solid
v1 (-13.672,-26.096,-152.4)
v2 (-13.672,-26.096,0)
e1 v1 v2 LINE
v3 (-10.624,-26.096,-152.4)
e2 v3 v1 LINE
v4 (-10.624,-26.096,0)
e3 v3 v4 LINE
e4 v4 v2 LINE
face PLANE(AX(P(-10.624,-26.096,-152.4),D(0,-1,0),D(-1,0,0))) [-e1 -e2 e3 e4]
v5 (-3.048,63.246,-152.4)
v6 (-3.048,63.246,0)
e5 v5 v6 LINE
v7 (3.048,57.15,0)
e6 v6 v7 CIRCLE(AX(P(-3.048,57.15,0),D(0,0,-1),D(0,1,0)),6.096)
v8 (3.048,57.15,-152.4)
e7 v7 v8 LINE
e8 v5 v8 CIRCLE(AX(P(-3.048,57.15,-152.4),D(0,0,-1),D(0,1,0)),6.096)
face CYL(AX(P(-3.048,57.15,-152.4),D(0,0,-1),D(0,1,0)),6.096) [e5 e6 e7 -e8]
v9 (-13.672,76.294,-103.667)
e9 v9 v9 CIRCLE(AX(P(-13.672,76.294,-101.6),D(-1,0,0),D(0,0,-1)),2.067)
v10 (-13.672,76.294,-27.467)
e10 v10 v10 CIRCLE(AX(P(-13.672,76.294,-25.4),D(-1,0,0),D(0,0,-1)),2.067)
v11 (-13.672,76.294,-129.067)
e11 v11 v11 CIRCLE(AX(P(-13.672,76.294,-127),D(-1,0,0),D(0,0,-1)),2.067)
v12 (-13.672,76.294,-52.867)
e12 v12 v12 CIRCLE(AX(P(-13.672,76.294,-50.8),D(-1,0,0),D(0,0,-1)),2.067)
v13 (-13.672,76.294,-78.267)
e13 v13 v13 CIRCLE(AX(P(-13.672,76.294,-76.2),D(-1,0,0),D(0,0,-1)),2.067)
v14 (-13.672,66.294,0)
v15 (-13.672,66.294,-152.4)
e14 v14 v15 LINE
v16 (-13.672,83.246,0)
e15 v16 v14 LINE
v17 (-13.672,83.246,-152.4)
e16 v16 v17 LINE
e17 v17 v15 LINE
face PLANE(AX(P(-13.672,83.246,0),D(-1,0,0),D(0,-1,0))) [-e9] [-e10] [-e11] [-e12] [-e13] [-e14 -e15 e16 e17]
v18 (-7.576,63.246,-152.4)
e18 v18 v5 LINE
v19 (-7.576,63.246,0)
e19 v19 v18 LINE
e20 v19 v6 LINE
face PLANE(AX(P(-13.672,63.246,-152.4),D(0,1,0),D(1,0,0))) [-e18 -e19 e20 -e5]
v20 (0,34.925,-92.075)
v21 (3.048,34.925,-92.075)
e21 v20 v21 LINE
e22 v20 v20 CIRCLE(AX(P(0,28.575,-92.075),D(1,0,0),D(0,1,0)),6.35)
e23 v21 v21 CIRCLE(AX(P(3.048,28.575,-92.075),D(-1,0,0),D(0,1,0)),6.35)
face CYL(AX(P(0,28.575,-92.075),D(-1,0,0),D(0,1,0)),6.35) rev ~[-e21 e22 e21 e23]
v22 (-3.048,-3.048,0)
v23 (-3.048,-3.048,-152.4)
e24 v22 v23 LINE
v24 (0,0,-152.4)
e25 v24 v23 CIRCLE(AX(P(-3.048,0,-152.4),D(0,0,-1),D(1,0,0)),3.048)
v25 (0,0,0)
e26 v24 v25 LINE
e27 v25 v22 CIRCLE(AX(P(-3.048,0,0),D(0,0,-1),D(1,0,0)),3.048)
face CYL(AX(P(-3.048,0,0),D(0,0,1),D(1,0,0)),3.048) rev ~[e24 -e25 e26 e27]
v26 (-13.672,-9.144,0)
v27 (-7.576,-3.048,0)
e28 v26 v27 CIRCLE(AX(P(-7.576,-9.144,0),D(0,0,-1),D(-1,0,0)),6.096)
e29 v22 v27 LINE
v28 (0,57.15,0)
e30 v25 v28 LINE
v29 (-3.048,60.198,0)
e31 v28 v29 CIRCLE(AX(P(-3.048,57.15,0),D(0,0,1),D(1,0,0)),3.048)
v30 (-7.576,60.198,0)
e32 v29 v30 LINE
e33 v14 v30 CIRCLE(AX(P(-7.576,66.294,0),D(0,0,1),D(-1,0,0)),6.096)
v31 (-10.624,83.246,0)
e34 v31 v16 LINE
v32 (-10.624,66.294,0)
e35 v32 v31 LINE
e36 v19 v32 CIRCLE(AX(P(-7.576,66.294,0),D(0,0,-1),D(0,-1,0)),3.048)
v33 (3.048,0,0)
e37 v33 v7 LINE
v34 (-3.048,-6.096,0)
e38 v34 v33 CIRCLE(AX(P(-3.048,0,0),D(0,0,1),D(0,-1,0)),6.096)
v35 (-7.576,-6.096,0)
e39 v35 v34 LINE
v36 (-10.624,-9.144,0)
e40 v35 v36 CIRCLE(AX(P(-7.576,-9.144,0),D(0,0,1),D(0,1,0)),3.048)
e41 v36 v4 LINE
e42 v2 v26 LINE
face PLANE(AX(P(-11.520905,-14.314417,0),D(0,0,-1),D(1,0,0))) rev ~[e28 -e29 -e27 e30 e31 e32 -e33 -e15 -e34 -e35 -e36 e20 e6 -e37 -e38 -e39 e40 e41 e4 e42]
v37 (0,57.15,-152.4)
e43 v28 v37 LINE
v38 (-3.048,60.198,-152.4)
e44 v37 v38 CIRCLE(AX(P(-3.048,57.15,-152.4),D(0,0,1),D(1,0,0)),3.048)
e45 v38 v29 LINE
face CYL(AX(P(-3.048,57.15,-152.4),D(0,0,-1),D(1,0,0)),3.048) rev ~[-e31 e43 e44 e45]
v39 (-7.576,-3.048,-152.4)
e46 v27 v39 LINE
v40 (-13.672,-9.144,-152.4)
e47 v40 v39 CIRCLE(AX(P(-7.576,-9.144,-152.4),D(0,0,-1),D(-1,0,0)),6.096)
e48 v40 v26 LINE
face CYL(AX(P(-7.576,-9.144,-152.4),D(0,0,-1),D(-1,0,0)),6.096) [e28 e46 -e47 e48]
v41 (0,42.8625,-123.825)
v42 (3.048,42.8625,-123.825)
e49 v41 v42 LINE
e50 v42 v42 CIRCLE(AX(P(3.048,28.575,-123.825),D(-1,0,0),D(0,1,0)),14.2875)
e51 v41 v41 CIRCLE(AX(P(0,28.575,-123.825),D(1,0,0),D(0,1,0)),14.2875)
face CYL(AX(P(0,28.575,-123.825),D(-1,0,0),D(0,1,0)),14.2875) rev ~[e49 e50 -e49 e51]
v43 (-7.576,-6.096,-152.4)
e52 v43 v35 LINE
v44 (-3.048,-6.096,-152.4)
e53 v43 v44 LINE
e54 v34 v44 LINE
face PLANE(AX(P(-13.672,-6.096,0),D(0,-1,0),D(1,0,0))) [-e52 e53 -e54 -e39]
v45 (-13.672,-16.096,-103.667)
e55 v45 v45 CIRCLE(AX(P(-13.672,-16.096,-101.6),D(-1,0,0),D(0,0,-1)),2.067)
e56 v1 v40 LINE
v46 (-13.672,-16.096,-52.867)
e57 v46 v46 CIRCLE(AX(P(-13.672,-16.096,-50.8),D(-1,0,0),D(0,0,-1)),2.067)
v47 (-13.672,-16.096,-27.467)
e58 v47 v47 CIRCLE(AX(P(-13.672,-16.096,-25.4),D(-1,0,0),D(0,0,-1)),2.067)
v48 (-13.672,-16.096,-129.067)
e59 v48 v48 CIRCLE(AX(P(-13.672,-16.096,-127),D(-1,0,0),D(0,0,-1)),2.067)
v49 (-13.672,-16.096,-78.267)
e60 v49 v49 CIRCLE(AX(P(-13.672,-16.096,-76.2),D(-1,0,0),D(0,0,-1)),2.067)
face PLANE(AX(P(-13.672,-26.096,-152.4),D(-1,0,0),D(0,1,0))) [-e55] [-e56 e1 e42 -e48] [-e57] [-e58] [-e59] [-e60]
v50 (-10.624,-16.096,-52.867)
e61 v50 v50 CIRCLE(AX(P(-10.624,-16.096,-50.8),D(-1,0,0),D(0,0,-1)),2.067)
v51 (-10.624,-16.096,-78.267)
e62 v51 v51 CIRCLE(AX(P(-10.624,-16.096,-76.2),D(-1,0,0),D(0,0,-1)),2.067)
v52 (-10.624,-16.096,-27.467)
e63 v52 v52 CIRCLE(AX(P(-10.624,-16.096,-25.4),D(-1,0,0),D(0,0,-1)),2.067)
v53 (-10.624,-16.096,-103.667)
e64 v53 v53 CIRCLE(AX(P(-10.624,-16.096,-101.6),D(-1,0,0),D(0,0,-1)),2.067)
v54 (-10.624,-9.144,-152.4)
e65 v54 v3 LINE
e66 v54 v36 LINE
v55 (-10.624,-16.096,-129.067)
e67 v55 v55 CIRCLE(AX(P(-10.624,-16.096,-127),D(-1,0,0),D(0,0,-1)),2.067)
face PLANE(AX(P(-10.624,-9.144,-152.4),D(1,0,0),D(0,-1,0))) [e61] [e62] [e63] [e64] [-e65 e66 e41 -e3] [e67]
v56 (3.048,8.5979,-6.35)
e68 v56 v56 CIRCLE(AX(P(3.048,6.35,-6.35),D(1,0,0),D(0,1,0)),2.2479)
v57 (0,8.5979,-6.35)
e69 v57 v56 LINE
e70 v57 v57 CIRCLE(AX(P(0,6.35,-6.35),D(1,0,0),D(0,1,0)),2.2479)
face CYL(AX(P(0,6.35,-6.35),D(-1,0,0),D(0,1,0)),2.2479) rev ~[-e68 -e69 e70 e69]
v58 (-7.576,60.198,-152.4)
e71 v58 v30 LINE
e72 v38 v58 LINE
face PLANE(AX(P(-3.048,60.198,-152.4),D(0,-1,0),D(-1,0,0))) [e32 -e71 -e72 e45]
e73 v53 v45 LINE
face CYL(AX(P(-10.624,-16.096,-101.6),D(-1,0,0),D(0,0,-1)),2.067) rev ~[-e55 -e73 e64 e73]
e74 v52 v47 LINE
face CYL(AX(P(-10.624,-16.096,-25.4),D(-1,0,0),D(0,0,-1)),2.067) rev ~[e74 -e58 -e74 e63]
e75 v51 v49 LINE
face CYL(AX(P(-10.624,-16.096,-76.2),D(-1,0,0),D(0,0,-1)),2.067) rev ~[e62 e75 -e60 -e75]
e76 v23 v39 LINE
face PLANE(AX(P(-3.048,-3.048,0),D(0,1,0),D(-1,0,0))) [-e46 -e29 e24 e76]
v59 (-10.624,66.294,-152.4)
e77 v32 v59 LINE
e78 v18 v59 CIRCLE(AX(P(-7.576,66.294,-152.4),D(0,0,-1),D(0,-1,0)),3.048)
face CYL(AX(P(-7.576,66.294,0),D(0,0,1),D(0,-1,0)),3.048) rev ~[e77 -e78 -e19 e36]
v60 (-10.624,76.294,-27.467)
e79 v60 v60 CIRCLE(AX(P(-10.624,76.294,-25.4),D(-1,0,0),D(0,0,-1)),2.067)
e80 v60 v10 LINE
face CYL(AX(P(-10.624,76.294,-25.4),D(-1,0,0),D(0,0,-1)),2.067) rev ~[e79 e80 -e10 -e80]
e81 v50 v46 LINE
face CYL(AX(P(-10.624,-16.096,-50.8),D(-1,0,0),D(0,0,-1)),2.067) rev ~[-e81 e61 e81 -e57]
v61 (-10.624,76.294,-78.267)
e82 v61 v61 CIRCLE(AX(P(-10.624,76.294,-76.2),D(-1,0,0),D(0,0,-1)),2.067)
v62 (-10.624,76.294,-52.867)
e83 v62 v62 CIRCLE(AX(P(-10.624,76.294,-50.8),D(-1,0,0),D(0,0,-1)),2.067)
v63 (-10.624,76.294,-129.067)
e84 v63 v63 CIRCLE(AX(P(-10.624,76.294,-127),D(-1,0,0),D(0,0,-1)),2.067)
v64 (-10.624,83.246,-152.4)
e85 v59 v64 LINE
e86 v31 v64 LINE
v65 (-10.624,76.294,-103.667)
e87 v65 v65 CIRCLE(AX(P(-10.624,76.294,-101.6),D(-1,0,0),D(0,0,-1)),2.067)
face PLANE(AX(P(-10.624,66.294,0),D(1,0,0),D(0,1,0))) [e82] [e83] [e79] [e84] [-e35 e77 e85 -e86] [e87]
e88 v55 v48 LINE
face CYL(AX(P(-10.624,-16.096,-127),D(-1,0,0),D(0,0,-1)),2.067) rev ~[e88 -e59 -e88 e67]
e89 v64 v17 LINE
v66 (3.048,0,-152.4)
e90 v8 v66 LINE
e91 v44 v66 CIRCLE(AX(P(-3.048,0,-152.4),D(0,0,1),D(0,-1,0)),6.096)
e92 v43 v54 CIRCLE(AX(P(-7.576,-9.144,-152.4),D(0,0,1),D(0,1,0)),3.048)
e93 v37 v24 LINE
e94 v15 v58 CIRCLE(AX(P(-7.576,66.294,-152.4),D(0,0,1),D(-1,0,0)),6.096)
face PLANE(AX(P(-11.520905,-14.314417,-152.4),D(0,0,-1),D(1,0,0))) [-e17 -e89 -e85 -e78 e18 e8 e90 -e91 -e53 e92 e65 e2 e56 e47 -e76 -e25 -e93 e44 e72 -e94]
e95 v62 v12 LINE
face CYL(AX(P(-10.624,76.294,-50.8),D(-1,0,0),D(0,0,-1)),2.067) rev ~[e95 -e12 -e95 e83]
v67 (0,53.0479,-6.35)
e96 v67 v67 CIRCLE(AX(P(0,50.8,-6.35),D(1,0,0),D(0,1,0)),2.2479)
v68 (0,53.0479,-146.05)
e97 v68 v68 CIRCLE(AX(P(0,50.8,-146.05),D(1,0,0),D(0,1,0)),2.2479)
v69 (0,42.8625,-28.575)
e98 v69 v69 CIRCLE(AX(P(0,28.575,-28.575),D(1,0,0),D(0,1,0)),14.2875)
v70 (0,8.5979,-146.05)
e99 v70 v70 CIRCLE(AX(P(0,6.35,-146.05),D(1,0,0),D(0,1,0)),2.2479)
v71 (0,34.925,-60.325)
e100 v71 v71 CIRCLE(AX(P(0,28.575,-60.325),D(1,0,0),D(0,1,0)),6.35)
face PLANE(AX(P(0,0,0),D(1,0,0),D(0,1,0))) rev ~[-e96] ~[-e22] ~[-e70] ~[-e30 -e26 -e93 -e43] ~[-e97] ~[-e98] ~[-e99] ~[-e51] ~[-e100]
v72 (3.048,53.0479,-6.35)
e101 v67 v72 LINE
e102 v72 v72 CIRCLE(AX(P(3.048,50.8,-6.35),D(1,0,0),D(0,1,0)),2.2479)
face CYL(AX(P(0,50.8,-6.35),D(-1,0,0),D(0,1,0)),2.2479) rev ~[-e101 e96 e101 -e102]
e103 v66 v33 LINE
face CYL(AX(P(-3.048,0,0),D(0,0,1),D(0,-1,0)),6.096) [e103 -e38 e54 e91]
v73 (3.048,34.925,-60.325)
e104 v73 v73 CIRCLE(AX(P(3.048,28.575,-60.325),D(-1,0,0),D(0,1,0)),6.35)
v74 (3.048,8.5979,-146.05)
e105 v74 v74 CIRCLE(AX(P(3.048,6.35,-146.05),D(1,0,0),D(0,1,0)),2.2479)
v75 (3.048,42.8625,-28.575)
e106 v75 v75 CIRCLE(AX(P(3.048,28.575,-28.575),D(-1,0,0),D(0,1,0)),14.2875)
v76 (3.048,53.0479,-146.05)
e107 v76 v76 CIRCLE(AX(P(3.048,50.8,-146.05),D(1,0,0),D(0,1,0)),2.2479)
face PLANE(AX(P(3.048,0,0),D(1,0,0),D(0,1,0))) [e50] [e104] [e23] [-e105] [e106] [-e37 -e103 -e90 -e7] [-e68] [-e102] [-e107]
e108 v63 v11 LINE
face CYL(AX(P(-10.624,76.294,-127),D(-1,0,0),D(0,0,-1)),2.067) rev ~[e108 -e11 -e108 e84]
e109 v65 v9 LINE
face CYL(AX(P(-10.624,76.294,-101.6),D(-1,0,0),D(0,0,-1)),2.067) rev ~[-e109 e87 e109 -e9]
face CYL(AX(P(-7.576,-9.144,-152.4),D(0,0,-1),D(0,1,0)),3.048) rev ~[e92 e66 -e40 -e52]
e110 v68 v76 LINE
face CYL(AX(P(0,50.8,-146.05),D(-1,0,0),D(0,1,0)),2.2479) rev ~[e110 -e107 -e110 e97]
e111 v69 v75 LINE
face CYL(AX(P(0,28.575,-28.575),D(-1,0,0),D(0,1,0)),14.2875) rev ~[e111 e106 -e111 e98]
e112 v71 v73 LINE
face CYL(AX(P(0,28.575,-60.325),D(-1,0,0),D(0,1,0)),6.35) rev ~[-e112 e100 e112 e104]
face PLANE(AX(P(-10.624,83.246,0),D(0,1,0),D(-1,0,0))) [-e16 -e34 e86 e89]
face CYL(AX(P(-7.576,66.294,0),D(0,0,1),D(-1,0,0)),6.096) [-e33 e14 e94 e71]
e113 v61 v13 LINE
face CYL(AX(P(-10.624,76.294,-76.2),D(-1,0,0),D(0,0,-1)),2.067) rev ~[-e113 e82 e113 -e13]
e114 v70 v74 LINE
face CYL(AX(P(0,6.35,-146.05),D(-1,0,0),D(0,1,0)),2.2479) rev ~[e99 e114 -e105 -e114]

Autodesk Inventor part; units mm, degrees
ref_plane "YZ Plane" through (0, 0, 0) normal (1, 0, 0) x (0, 1, 0)
ref_plane "XZ Plane" through (0, 0, 0) normal (0, 1, 0) x (-1, 0, 0)
ref_plane "XY Plane" through (0, 0, 0) normal (0, 0, 1) x (1, 0, 0)
sketch "Sketch3" plane through (-13.672, 63.246, 0) normal (0, 1, 0) x (1, 0, 0)
  line L0 (10.624, 0) -> (10.624, 152.4) projected
  line L1 (0, 152.4) -> (10.624, 152.4) projected
  line L2 (0, 0) -> (0, 152.4) projected
  line L3 (10.624, 0) -> (0, 0) projected
  point P0 (13.672, 0)
  point P1 (5.312, 127)
  point P2 (5.312, 152.4)
  point P3 (5.312, 101.6)
  point P4 (5.312, 76.2)
  point P5 (5.312, 50.8)
  point P6 (5.312, 25.4)
  dimension "d28" = 25.4
  dimension "d31" = 25.4
sketch "Sketch1" plane through (0, 0, 0) normal (1, 0, 0) x (0, 1, 0)
  line L0 (0, 0) -> (57.15, 0)
  line L1 (57.15, 0) -> (57.15, -152.4)
  line L2 (57.15, -152.4) -> (0, -152.4)
  line L3 (0, -152.4) -> (0, 0)
  circle A0 centre (28.575, -28.575) radius 14.2875
  circle A1 centre (28.575, -60.325) radius 6.35
  circle A2 centre (28.575, -92.075) radius 6.35
  circle A3 centre (28.575, -123.825) radius 14.2875
  circle A4 centre (50.8, -6.35) radius 2.2479
  circle A5 centre (50.8, -146.05) radius 2.2479
  circle A6 centre (6.35, -146.05) radius 2.2479
  circle A7 centre (6.35, -6.35) radius 2.2479
  line L4 (50.8, -6.35) -> (6.35, -6.35) construction
  line L5 (6.35, -6.35) -> (6.35, -146.05) construction
  line L6 (6.35, -146.05) -> (50.8, -146.05) construction
  line L7 (50.8, -146.05) -> (50.8, -6.35) construction
  line L8 (57.15, 0) -> (69.85, 0)
  line L9 (69.85, 0) -> (69.85, -152.4)
  line L10 (69.85, -152.4) -> (57.15, -152.4)
  line L11 (57.15, -152.4) -> (57.15, 0)
  line L12 (0, -152.4) -> (-12.7, -152.4)
  line L13 (-12.7, -152.4) -> (-12.7, 0)
  line L14 (-12.7, 0) -> (0, 0)
  line L15 (0, 0) -> (0, -152.4)
  line L16 (28.575, -123.825) -> (28.575, -28.575)
  point P0 (28.575, -152.4)
  point P1 (28.575, -6.35)
  point P2 (28.575, 0)
  point P3 (50.8, -76.2)
  point P4 (57.15, -76.2)
  point P5 (57.15, -76.2)
  point P6 (28.575, -76.2)
  dimension "d0" = 57.15
  dimension "d1" = 152.4
  dimension "d2" = 31.75
  dimension "d3" = 31.75
  dimension "d4" = 31.75
  dimension "d6" = 28.575
  dimension "d7" = 12.7
  dimension "d8" = 28.575
  dimension "d11" = 4.4958
  dimension "d12" = 139.7
  dimension "d13" = 44.45
  dimension "d14" = 12.7
  dimension "d15" = 152.4
  dimension "d16" = 12.7
  dimension "d17" = 152.4
extrude "Plate2" add sketch "Sketch1" along normal blind 3.048 contours L0 L1 L2 L3
sketch "Sketch2" plane through (-3.048, 60.198, -152.4) normal (0, 1, 0) x (-1, 0, 0)
  line L0 (0, 152.4) -> (0, 0)
  line L1 (0, 0) -> (10.624, 0)
  line L2 (10.624, 0) -> (10.624, 152.4)
  line L3 (10.624, 152.4) -> (0, 152.4)
edge flange "Flange1" height 16.72 angle 90 thickness 3.048 bend radius 3.048 thickness toward (0, 1, 0) relief tear relief width 3.048 relief depth 1.524 corner gap 3.048 corner form 0 edges at (0, 57.15, -76.2) (0, 0, -76.2) wall of the first edge with corners at (-3.048, 60.198, 0) (-3.048, 60.198, -152.4) (-13.672, 60.198, -152.4) (-13.672, 60.198, 0)
bend "Bend1"
corner "Corner1"
sketch "Sketch4" plane through (-10.624, -3.048, -152.4) normal (-1, 0, 0) x (0, -1, 0)
  line L0 (0, 152.4) -> (0, 0)
  line L1 (0, 0) -> (23.048, 0)
  line L2 (23.048, 0) -> (23.048, 152.4)
  line L3 (23.048, 152.4) -> (0, 152.4)
edge flange "Flange2" height 20 angle 90 thickness 3.048 bend radius 3.048 thickness toward (-1, 0, 0) relief tear relief width 3.048 relief depth 1.524 corner gap 3.048 corner form 0 edges at (-13.672, -6.096, -76.2) (-13.672, 63.246, -76.2) wall of the first edge with corners at (-10.624, -3.048, 0) (-10.624, -3.048, -152.4) (-10.624, -26.096, -152.4) (-10.624, -26.096, 0)
bend "Bend2"
corner "Corner2"
sketch "Sketch5" plane through (-10.624, -26.096, 0) normal (1, 0, 0) x (0, 0, -1)
  line L0 (152.4, 16.952) -> (152.4, 0) projected
  line L1 (0, 0) -> (152.4, 0) projected
  point P0 (0, 26.096)
  point P1 (127, 10)
  point P2 (101.6, 10)
  point P3 (76.2, 10)
  point P4 (50.8, 10)
  point P5 (25.4, 10)
  point P6 (50.8, 102.39)
  point P7 (25.4, 102.39)
  point P8 (76.2, 102.39)
  point P9 (101.6, 102.39)
  point P10 (127, 102.39)
  dimension "d53" = 25.4
  dimension "d54" = 10
  dimension "d57" = 25.4
  dimension "d74" = 92.39
hole "Hole2" at (-10.624, -16.096, -127) at (-10.624, -16.096, -101.6) at (-10.624, -16.096, -76.2) at (-10.624, -16.096, -50.8) at (-10.624, -16.096, -25.4) at (-10.624, 76.294, -25.4) at (-10.624, 76.294, -50.8) at (-10.624, 76.294, -76.2) at (-10.624, 76.294, -101.6) at (-10.624, 76.294, -127) direction (-1, 0, 0) diameter 4.134 end through all
equation "\"d10\" = Thickness"
equation "\"d18\" = BendReliefWidth"
equation "\"d19\" = BendReliefDepth"
equation "\"d20\" = MinimumRemnant"
equation "\"d21\" = TransitionRadius"
equation "\"d24\" = BendRadius"
equation "\"d25\" = CornerReliefSize"
equation "\"d26\" = GapSize"
equation "\"d27\" = JacobiRadiusSize"
equation "\"d43\" = BendReliefWidth"
equation "\"d44\" = BendReliefDepth"
equation "\"d45\" = MinimumRemnant"
equation "\"d46\" = TransitionRadius"
equation "\"d49\" = BendRadius"
equation "\"d50\" = CornerReliefSize"
equation "\"d51\" = GapSize"
equation "\"d52\" = JacobiRadiusSize"
equation "\"BendRadius\" = Thickness"
equation "\"BendReliefWidth\" = Thickness"
equation "\"BendReliefDepth\" = 0.5 * Thickness"
equation "\"CornerReliefSize\" = 4 * Thickness"
equation "\"MinimumRemnant\" = 2 * Thickness"
equation "\"TransitionRadius\" = BendRadius"
equation "\"JacobiRadiusSize\" = BendRadius"
equation "\"GapSize\" = Thickness"
equation "\"Thickness\" = 3.048"
properties part number "CH-1-01-RearGearboxHousingMotorSide" material "Steel, Alloy"
